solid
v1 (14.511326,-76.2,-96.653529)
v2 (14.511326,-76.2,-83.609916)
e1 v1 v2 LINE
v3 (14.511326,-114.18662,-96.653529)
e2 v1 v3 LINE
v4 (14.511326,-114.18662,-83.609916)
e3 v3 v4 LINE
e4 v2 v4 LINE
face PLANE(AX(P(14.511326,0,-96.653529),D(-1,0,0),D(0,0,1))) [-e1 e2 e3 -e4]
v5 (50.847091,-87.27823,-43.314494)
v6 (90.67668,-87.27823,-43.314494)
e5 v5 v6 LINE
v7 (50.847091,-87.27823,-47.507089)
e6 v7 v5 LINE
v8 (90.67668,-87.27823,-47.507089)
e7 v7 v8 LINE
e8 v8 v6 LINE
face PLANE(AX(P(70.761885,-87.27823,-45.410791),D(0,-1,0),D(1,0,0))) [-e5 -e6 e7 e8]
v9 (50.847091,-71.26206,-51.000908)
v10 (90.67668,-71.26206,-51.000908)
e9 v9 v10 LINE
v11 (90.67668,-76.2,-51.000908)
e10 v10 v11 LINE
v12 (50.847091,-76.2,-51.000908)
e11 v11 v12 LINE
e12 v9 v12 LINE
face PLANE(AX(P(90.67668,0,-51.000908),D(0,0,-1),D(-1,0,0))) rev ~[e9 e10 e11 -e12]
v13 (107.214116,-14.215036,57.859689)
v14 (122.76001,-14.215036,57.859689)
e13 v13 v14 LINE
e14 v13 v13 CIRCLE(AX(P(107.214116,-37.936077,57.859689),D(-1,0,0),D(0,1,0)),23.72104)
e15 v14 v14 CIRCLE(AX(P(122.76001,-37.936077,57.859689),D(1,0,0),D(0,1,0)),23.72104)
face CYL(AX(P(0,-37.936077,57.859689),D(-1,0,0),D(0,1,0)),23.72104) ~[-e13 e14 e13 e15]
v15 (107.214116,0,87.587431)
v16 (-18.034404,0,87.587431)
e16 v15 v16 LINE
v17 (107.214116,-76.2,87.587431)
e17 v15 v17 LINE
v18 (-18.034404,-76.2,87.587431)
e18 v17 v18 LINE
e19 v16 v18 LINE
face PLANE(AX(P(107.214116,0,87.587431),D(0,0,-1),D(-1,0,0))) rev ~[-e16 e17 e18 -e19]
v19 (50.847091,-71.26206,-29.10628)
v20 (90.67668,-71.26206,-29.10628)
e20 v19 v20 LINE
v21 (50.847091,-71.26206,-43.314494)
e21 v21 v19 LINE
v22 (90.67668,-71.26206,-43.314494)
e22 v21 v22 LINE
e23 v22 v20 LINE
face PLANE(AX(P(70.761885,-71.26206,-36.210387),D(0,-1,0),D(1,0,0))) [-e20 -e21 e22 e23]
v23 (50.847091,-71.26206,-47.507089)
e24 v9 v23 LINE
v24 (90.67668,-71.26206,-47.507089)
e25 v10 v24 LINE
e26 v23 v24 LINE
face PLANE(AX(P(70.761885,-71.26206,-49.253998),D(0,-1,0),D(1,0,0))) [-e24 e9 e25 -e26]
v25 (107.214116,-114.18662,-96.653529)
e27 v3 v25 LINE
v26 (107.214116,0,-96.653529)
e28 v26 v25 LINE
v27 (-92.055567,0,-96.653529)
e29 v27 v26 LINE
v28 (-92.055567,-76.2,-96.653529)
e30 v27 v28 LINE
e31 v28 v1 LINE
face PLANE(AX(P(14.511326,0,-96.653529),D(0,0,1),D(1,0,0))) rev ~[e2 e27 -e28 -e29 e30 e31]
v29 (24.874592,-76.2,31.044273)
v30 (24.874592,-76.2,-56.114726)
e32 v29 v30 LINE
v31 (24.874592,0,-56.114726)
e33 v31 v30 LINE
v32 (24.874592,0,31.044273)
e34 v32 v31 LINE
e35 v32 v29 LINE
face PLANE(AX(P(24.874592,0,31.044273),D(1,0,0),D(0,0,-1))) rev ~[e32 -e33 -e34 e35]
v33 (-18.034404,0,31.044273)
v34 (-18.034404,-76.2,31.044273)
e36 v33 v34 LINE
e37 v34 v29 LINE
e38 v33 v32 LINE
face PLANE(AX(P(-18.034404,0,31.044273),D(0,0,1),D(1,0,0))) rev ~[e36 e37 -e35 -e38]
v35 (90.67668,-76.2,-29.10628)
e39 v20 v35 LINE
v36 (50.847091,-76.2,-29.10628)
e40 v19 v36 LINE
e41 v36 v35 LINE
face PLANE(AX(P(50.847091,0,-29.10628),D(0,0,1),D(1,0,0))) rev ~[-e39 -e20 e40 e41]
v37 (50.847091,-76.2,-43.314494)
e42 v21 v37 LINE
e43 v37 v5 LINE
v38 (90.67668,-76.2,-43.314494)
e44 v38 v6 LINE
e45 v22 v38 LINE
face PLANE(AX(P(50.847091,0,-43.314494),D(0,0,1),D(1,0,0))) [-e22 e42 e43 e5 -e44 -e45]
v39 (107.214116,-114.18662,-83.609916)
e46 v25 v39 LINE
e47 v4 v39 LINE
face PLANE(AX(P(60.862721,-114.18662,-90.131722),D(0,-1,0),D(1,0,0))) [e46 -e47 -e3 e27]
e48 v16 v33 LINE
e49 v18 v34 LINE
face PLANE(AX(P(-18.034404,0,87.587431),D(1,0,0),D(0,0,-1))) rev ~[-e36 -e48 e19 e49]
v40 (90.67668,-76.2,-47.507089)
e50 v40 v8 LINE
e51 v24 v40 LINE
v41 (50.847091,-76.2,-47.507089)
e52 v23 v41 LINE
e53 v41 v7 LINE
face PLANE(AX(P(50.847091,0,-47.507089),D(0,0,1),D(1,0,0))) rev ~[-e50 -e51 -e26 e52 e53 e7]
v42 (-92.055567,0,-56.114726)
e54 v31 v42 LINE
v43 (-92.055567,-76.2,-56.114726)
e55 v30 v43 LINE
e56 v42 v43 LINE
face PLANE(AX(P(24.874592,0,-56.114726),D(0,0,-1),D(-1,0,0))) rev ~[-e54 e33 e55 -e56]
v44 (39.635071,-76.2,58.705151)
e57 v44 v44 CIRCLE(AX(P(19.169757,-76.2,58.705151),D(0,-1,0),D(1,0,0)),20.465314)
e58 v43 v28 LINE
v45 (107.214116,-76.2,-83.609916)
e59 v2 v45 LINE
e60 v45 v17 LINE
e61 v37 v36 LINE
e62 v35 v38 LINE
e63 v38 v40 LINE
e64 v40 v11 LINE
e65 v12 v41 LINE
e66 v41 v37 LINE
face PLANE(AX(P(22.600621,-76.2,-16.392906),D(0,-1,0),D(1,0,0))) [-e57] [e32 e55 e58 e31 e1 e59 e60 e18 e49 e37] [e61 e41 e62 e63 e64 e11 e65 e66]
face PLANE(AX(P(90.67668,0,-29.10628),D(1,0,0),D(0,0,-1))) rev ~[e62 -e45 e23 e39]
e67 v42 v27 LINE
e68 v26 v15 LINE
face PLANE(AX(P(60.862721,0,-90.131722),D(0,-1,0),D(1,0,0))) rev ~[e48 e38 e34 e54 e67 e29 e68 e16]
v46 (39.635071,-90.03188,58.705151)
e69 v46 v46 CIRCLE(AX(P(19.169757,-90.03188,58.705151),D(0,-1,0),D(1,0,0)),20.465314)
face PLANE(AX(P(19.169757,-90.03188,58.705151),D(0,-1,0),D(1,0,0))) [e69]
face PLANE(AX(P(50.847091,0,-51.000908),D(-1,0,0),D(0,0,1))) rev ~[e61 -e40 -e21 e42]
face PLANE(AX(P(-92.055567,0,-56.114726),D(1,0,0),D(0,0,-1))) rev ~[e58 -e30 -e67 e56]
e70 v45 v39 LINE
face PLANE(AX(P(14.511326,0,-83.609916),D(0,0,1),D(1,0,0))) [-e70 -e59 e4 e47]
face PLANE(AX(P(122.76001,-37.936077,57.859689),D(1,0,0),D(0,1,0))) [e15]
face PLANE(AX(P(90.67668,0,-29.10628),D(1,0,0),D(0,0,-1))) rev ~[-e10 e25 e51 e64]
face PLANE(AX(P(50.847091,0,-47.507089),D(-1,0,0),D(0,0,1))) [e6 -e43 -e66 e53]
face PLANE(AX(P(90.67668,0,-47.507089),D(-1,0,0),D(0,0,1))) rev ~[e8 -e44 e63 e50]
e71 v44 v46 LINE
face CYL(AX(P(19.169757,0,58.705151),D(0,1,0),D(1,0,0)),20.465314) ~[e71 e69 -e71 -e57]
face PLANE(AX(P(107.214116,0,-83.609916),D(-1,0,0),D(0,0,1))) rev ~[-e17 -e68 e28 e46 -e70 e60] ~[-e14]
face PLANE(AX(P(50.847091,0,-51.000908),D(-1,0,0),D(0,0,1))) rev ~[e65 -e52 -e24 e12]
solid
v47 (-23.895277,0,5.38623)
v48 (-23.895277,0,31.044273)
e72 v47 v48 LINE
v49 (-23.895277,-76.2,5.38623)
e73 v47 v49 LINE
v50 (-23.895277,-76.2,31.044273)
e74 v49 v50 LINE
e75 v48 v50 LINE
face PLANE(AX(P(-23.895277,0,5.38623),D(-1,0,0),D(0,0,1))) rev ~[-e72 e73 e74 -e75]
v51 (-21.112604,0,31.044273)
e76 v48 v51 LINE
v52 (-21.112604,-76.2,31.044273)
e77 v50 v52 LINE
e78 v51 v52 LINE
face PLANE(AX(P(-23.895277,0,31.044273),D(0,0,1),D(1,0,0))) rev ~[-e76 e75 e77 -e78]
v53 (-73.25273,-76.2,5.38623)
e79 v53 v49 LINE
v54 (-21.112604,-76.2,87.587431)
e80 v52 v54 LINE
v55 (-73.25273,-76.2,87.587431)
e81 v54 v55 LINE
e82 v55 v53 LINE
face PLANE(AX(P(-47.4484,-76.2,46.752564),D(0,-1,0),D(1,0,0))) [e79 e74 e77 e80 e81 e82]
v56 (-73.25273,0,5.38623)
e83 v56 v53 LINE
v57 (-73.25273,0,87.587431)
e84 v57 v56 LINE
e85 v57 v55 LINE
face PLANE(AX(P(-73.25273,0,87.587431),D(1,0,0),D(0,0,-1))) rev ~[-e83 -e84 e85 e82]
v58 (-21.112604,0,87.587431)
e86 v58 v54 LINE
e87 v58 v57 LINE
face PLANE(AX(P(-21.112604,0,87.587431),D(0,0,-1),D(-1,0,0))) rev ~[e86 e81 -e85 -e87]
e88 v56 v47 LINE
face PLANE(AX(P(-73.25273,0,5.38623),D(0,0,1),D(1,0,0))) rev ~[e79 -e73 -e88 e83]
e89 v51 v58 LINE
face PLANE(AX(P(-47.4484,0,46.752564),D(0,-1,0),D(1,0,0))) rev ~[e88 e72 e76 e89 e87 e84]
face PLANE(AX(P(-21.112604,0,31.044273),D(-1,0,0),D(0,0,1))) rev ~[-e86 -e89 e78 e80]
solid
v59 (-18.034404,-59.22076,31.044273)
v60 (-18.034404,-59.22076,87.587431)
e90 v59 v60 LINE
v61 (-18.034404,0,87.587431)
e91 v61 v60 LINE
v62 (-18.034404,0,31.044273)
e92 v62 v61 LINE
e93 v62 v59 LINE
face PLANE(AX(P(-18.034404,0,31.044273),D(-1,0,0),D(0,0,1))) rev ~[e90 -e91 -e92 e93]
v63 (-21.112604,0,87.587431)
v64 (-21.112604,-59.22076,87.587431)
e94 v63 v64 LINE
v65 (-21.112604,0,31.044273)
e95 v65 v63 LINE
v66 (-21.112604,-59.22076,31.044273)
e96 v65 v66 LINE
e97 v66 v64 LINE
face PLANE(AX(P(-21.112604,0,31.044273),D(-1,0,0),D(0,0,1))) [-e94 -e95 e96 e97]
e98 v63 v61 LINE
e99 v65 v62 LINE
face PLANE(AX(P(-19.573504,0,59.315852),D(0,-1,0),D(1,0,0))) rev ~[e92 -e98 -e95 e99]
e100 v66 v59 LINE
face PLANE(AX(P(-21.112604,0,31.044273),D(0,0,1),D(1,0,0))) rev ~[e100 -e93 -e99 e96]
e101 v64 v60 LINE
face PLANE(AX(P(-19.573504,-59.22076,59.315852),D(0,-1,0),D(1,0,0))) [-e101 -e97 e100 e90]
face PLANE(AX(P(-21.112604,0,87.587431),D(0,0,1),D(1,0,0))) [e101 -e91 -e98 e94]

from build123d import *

# Parameters (mm, degrees)
F2_DEPTH = 76.2
F0_R     = 20.4653135308
F3_DEPTH = 90.03188
F0_W     = 39.8295894265
F0_H     = 14.2082143575
F0_H_2   = 3.4938193858
F4_DEPTH = 71.26206
F0_H_3   = 4.1925944388
F5_DEPTH = 87.27823
F0_W_2   = 92.7027892321
F0_H_4   = 13.0436122417
F6_DEPTH = 114.18662
F0_W_3   = 3.078199923
F0_H_5   = 56.5431583673
F7_DEPTH = 59.22076
F1_R     = 23.7210403161
F8_DEPTH = 122.76001


with BuildPart() as f2:
    # F0 (on Front) → F2 (new body)
    with BuildSketch(Plane.XZ):
        Polygon((-73.2527300715, 87.5874310732), (-73.2527300715, 5.3862300701), (-23.8952767104, 5.3862300701), (-23.8952767104, 31.0442727059), (-21.1126040667, 31.0442727059), (-21.1126040667, 87.5874310732), align=None)
    extrude(amount=F2_DEPTH)


with BuildPart() as f2b:
    # F0 (on Front) → F2, piece 2 (new body)
    with BuildSketch(Plane.XZ):
        Polygon((107.2141155601, 87.5874310732), (-18.0344041437, 87.5874310732), (-18.0344041437, 31.0442727059), (24.8745921999, 31.0442727059), (24.8745921999, -56.1147257686), (-92.0555666089, -56.1147257686), (-92.0555666089, -96.6535285115), (14.5113263279, -96.6535285115), (14.5113263279, -83.6099162698), (107.2141155601, -83.6099162698), align=None)
        Polygon((90.6766802073, -51.0009080172), (50.8470907807, -51.0009080172), (50.8470907807, -47.5070886314), (50.8470907807, -43.3144941926), (50.8470907807, -29.1062798351), (90.6766802073, -29.1062798351), (90.6766802073, -43.3144941926), (90.6766802073, -47.5070886314), align=None, mode=Mode.SUBTRACT)
        with Locations((19.1697571427, 58.7051510811)):
            Circle(F0_R, mode=Mode.SUBTRACT)
    extrude(amount=F2_DEPTH)

    # F0 (on Front) → F3 (join)
    with BuildSketch(Plane.XZ):
        with Locations((19.1697571427, 58.7051510811)):
            Circle(F0_R)
    extrude(amount=F3_DEPTH)

    # F0 (on Front) → F4 (join)
    with BuildSketch(Plane.XZ):
        with Locations((70.761885494, -36.2103870139)):
            Rectangle(F0_W, F0_H)
        with Locations((70.761885494, -49.2539983243)):
            Rectangle(F0_W, F0_H_2)
    extrude(amount=F4_DEPTH)

    # F0 (on Front) → F5 (join)
    with BuildSketch(Plane.XZ):
        with Locations((70.761885494, -45.410791412)):
            Rectangle(F0_W, F0_H_3)
    extrude(amount=F5_DEPTH)

    # F0 (on Front) → F6 (join)
    with BuildSketch(Plane.XZ):
        with Locations((60.862720944, -90.1317223907)):
            Rectangle(F0_W_2, F0_H_4)
    extrude(amount=F6_DEPTH)

    # F1 (on Right) → F8 (join)
    with BuildSketch(Plane.YZ):
        with Locations((-37.9360765219, 57.8596889973)):
            Circle(F1_R)
    extrude(amount=F8_DEPTH)


with BuildPart() as f7:
    # F0 (on Front) → F7 (new body)
    with BuildSketch(Plane.XZ):
        with Locations((-19.5735041052, 59.3158518896)):
            Rectangle(F0_W_3, F0_H_5)
    extrude(amount=F7_DEPTH)


solid = Compound([f2.part, f2b.part, f7.part])
